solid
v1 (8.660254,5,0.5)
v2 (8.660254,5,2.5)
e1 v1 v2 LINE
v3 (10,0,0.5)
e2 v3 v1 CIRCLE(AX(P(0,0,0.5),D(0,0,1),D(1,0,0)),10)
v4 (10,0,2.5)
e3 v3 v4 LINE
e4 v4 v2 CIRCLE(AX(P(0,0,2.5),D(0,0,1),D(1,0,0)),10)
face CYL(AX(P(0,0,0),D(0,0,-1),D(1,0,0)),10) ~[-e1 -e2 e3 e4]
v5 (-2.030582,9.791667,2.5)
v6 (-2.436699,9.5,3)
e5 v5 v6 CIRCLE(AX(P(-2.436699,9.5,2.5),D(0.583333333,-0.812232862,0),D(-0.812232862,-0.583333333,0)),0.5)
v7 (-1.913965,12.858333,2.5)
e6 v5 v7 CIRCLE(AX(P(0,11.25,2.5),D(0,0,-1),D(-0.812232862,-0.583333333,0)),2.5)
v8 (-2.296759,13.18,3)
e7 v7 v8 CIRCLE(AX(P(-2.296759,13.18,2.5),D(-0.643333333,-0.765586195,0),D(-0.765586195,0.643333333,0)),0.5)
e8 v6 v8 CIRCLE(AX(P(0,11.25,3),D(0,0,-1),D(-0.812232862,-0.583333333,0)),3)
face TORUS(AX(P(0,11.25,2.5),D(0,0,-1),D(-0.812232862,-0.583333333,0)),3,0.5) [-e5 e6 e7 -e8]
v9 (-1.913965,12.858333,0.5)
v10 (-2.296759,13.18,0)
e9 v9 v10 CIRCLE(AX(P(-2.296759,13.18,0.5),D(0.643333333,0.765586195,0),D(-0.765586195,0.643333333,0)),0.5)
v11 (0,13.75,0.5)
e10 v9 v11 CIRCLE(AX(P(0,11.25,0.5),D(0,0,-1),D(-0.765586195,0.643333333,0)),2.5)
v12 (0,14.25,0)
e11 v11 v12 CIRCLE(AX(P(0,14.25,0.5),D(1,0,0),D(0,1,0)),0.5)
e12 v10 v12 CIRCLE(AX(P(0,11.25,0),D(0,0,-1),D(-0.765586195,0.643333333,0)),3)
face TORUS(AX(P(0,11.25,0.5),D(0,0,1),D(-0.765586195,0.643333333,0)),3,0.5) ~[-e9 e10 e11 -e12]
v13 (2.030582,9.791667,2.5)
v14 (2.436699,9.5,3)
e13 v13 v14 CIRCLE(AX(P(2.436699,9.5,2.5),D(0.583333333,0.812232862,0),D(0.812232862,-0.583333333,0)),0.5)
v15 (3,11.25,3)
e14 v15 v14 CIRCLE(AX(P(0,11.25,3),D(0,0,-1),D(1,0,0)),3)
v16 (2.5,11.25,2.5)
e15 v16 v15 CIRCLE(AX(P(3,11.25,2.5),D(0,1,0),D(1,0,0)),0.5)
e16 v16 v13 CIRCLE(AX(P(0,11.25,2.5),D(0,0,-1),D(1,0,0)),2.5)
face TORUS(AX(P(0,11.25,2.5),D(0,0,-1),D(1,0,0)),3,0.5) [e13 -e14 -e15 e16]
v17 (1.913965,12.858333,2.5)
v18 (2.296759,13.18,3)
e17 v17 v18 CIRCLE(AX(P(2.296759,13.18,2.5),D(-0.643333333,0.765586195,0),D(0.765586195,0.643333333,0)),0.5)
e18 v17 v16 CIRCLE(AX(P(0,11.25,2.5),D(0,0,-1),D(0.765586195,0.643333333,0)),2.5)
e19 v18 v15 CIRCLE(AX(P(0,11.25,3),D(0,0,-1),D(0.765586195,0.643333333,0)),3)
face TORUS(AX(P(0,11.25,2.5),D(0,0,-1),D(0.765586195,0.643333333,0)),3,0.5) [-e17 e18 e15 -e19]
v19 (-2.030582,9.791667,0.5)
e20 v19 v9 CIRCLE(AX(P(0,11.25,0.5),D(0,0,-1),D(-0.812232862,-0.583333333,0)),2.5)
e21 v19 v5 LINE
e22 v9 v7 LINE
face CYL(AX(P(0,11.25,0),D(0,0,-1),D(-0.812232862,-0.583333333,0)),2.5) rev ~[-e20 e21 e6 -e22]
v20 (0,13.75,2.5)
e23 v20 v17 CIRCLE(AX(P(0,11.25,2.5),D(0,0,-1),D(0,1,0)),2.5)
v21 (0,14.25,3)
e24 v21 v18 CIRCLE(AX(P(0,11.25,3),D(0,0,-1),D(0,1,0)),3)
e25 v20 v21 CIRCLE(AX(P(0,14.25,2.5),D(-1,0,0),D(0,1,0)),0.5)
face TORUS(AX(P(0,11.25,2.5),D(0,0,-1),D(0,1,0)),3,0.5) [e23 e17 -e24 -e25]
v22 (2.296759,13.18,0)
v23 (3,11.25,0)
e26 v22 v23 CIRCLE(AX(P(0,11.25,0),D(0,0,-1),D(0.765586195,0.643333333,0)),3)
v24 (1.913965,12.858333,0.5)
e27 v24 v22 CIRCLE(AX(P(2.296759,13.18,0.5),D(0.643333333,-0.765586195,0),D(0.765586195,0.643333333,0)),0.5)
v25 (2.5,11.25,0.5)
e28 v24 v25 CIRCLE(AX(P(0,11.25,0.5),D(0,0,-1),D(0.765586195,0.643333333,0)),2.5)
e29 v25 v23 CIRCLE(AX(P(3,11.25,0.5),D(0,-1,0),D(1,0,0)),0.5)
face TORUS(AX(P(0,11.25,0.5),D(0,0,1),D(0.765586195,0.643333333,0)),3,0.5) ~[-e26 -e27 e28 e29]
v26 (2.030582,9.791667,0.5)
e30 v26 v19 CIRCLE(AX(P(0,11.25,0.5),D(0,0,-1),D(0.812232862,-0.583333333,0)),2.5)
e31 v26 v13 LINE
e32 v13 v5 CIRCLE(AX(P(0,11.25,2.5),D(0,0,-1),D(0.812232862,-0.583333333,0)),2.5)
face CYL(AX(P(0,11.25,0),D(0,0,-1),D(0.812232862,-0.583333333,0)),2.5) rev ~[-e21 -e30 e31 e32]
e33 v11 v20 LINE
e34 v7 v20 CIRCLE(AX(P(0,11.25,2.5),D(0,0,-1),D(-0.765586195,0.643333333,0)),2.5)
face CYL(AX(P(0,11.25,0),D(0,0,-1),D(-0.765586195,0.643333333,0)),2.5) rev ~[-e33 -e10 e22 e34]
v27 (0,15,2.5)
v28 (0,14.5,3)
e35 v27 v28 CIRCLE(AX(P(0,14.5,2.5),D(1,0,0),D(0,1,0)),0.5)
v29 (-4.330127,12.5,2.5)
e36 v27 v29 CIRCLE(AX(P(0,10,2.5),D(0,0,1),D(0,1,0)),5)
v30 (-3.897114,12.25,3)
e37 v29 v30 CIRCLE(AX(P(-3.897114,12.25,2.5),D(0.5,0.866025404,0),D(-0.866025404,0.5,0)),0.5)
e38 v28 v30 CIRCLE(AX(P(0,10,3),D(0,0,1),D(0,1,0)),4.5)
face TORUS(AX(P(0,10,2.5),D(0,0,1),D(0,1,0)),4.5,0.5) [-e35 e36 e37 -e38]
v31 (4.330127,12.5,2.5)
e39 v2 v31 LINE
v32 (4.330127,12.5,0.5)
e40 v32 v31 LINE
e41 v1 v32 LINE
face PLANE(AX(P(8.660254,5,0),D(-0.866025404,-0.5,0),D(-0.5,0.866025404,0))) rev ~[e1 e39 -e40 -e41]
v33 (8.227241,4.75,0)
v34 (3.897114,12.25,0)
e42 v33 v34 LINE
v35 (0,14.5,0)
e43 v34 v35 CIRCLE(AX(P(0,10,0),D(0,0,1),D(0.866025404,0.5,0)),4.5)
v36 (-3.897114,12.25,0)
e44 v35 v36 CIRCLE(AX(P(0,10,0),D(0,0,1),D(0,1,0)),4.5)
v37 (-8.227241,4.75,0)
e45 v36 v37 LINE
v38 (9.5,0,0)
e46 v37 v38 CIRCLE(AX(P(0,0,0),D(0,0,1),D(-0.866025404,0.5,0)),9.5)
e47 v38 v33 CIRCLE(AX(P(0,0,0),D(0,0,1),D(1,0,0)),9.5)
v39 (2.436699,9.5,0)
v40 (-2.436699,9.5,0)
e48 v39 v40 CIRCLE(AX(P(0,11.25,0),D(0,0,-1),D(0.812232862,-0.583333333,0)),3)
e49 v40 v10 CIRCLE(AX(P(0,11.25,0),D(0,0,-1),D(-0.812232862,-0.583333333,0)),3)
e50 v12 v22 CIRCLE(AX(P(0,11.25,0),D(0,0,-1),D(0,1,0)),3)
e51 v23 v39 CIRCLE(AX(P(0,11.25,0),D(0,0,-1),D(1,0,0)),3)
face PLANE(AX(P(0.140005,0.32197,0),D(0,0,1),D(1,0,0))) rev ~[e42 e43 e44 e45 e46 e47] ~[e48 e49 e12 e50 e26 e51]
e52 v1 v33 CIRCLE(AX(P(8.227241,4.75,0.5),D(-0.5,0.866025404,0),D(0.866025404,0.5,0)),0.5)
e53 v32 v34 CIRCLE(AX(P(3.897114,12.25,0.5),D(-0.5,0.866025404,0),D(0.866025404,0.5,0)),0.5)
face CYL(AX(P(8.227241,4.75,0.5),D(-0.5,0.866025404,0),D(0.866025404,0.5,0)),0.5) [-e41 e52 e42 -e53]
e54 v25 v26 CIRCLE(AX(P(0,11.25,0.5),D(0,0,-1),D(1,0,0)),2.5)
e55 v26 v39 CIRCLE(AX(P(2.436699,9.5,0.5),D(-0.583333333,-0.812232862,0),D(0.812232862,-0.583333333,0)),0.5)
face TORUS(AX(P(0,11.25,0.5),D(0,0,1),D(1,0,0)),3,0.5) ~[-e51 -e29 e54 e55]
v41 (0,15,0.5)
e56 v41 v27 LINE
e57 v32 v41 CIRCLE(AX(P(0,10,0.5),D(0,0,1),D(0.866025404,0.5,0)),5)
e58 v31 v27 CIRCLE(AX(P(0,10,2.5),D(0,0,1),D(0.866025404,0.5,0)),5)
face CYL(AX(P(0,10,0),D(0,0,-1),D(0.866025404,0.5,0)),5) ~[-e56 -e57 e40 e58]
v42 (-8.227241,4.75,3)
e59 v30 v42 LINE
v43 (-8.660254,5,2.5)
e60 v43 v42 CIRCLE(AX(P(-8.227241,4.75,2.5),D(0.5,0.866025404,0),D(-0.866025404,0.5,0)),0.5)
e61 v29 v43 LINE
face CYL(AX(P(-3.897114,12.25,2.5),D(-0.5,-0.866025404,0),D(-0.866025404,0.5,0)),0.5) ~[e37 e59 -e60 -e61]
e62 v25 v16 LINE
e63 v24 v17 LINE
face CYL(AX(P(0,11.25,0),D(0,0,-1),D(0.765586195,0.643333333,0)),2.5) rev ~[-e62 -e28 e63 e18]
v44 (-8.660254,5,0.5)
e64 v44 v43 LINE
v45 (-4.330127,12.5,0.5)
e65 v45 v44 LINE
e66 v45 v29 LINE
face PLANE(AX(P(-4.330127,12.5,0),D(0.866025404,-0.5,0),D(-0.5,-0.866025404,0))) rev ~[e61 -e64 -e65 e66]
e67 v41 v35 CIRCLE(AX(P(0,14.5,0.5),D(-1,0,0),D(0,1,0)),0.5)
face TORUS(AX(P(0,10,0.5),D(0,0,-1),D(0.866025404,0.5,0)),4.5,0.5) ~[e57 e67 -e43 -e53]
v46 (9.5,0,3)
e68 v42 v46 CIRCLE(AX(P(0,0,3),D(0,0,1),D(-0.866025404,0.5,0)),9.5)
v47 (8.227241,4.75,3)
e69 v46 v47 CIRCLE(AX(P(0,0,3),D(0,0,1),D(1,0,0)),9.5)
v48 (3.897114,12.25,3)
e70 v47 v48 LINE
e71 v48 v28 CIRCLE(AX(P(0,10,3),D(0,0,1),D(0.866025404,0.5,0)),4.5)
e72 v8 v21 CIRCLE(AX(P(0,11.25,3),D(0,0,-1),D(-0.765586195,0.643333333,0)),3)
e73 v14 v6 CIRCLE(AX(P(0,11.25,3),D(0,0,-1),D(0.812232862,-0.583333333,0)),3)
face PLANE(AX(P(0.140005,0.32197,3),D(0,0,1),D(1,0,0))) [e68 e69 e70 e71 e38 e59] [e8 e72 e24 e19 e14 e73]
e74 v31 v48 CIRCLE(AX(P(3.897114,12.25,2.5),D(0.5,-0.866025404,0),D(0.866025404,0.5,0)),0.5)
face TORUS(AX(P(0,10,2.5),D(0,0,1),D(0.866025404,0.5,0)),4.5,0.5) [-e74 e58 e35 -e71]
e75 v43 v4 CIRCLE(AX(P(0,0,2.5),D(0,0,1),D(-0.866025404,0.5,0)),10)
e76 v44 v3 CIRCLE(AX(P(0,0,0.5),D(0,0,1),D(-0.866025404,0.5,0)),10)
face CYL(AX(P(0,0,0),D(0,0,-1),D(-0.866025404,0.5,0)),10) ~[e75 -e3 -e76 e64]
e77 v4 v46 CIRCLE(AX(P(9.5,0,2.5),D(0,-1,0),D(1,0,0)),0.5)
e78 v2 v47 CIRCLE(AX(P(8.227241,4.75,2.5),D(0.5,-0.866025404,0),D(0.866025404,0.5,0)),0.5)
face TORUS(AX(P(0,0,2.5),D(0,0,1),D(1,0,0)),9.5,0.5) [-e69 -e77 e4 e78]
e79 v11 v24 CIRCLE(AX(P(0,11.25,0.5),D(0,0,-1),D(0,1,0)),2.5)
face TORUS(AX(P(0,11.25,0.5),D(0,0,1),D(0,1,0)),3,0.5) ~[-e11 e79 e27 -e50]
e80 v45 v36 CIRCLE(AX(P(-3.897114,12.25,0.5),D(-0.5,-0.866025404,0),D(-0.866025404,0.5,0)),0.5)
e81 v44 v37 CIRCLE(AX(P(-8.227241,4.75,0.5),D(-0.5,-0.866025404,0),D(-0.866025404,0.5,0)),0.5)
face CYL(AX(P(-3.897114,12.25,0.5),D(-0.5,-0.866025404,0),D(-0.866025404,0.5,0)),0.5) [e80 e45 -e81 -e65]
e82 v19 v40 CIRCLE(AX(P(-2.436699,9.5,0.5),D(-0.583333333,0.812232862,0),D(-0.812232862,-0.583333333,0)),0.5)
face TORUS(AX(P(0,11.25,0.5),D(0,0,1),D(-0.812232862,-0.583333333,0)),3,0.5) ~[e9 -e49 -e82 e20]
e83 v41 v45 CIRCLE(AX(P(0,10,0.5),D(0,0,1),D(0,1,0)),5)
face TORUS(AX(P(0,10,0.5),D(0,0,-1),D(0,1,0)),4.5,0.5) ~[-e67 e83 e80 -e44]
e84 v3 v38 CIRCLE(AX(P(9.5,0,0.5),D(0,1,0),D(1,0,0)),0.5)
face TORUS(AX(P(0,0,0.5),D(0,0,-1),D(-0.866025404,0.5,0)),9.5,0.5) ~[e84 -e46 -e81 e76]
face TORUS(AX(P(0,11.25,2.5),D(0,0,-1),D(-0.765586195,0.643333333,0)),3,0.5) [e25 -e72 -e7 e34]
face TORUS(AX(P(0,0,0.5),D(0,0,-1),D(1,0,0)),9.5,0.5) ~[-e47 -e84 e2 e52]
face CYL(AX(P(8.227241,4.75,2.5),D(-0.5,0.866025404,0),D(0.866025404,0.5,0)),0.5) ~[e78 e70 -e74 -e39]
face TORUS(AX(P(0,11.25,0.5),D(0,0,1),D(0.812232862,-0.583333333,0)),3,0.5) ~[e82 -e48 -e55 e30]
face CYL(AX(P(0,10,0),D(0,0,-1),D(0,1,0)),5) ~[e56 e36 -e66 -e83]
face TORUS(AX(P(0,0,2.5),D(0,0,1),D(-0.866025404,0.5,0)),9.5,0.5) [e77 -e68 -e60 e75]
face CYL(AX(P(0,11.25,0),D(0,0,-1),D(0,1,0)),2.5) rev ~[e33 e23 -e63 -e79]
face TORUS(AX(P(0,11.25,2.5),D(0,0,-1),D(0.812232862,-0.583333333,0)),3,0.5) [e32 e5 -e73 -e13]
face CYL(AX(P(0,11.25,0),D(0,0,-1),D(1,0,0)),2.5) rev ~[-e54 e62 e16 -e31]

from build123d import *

# Parameters (mm, degrees)
F1_DEPTH = 3
F2_R     = 0.5


with BuildPart() as f1:
    # F0 (on Top) → F1 (new body)
    with BuildSketch(Plane.XY):
        with BuildLine():
            ThreePointArc((-8.6602540378, 5), (-2.588190451, -9.6592582629), (10, 0))
            ThreePointArc((10, 0), (9.6592582629, 2.588190451), (8.6602540378, 5))
            ThreePointArc((8.6602540378, 5), (7.0062926922, 7.1352549156), (4.8412291828, 8.75))
            ThreePointArc((4.8412291828, 8.75), (0, 5), (-4.8412291828, 8.75))
            ThreePointArc((-4.8412291828, 8.75), (-7.0062926922, 7.1352549156), (-8.6602540378, 5))
        make_face()
        with BuildLine():
            Line((-4.3301270189, 12.5), (-8.6602540378, 5))
            ThreePointArc((-8.6602540378, 5), (-7.0062926922, 7.1352549156), (-4.8412291828, 8.75))
            ThreePointArc((-4.8412291828, 8.75), (-4.9541970736, 10.6752268918), (-4.3301270189, 12.5))
        make_face()
        with BuildLine():
            ThreePointArc((-4.8412291828, 8.75), (0, 5), (4.8412291828, 8.75))
            ThreePointArc((4.8412291828, 8.75), (3.4751568493, 9.3767416981), (2.0305821552, 9.7916666667))
            ThreePointArc((2.0305821552, 9.7916666667), (0, 8.75), (-2.0305821552, 9.7916666667))
            ThreePointArc((-2.0305821552, 9.7916666667), (-3.4751568493, 9.3767416981), (-4.8412291828, 8.75))
        make_face()
        with BuildLine():
            ThreePointArc((2.0305821552, 9.7916666667), (3.4751568493, 9.3767416981), (4.8412291828, 8.75))
            ThreePointArc((4.8412291828, 8.75), (4.9601484813, 9.3699785376), (5, 10))
            ThreePointArc((5, 10), (4.8296291314, 11.2940952255), (4.3301270189, 12.5))
            ThreePointArc((4.3301270189, 12.5), (2.5, 14.3301270189), (0, 15))
            Line((0, 15), (0, 13.75))
            ThreePointArc((0, 13.75), (1.0557382883, 13.5161457735), (1.9139654879, 12.8583333333))
            ThreePointArc((1.9139654879, 12.8583333333), (2.3489267464, 12.1058873408), (2.5, 11.25))
            ThreePointArc((2.5, 11.25), (2.3797537045, 10.4839893564), (2.0305821552, 9.7916666667))
        make_face()
        with BuildLine():
            ThreePointArc((4.8412291828, 8.75), (7.0062926922, 7.1352549156), (8.6602540378, 5))
            Line((8.6602540378, 5), (4.3301270189, 12.5))
            ThreePointArc((4.3301270189, 12.5), (4.8296291314, 11.2940952255), (5, 10))
            ThreePointArc((5, 10), (4.9601484813, 9.3699785376), (4.8412291828, 8.75))
        make_face()
        with BuildLine():
            ThreePointArc((-4.3301270189, 12.5), (-4.9541970736, 10.6752268918), (-4.8412291828, 8.75))
            ThreePointArc((-4.8412291828, 8.75), (-3.4751568493, 9.3767416981), (-2.0305821552, 9.7916666667))
            ThreePointArc((-2.0305821552, 9.7916666667), (-2.4981943756, 11.3449992725), (-1.9139654879, 12.8583333333))
            ThreePointArc((-1.9139654879, 12.8583333333), (-1.0557382883, 13.5161457735), (0, 13.75))
            Line((0, 13.75), (0, 15))
            ThreePointArc((0, 15), (-2.5, 14.3301270189), (-4.3301270189, 12.5))
        make_face()
    extrude(amount=F1_DEPTH)

    # F2
    f2_edges = [f1.edges().sort_by_distance(p)[0] for p in [
        (6.495191, 8.75, 3),
        (0, 15, 3),
        (0, 15, 0),
        (6.495191, 8.75, 0),
        (0, -10, 0),
        (0, -10, 3),
        (-6.495191, 8.75, 3),
        (2.030582, 12.708333, 3),
        (2.030582, 12.708333, 0),
        (-6.495191, 8.75, 0),
    ]]
    fillet(f2_edges, radius=F2_R)


solid = f1.part
